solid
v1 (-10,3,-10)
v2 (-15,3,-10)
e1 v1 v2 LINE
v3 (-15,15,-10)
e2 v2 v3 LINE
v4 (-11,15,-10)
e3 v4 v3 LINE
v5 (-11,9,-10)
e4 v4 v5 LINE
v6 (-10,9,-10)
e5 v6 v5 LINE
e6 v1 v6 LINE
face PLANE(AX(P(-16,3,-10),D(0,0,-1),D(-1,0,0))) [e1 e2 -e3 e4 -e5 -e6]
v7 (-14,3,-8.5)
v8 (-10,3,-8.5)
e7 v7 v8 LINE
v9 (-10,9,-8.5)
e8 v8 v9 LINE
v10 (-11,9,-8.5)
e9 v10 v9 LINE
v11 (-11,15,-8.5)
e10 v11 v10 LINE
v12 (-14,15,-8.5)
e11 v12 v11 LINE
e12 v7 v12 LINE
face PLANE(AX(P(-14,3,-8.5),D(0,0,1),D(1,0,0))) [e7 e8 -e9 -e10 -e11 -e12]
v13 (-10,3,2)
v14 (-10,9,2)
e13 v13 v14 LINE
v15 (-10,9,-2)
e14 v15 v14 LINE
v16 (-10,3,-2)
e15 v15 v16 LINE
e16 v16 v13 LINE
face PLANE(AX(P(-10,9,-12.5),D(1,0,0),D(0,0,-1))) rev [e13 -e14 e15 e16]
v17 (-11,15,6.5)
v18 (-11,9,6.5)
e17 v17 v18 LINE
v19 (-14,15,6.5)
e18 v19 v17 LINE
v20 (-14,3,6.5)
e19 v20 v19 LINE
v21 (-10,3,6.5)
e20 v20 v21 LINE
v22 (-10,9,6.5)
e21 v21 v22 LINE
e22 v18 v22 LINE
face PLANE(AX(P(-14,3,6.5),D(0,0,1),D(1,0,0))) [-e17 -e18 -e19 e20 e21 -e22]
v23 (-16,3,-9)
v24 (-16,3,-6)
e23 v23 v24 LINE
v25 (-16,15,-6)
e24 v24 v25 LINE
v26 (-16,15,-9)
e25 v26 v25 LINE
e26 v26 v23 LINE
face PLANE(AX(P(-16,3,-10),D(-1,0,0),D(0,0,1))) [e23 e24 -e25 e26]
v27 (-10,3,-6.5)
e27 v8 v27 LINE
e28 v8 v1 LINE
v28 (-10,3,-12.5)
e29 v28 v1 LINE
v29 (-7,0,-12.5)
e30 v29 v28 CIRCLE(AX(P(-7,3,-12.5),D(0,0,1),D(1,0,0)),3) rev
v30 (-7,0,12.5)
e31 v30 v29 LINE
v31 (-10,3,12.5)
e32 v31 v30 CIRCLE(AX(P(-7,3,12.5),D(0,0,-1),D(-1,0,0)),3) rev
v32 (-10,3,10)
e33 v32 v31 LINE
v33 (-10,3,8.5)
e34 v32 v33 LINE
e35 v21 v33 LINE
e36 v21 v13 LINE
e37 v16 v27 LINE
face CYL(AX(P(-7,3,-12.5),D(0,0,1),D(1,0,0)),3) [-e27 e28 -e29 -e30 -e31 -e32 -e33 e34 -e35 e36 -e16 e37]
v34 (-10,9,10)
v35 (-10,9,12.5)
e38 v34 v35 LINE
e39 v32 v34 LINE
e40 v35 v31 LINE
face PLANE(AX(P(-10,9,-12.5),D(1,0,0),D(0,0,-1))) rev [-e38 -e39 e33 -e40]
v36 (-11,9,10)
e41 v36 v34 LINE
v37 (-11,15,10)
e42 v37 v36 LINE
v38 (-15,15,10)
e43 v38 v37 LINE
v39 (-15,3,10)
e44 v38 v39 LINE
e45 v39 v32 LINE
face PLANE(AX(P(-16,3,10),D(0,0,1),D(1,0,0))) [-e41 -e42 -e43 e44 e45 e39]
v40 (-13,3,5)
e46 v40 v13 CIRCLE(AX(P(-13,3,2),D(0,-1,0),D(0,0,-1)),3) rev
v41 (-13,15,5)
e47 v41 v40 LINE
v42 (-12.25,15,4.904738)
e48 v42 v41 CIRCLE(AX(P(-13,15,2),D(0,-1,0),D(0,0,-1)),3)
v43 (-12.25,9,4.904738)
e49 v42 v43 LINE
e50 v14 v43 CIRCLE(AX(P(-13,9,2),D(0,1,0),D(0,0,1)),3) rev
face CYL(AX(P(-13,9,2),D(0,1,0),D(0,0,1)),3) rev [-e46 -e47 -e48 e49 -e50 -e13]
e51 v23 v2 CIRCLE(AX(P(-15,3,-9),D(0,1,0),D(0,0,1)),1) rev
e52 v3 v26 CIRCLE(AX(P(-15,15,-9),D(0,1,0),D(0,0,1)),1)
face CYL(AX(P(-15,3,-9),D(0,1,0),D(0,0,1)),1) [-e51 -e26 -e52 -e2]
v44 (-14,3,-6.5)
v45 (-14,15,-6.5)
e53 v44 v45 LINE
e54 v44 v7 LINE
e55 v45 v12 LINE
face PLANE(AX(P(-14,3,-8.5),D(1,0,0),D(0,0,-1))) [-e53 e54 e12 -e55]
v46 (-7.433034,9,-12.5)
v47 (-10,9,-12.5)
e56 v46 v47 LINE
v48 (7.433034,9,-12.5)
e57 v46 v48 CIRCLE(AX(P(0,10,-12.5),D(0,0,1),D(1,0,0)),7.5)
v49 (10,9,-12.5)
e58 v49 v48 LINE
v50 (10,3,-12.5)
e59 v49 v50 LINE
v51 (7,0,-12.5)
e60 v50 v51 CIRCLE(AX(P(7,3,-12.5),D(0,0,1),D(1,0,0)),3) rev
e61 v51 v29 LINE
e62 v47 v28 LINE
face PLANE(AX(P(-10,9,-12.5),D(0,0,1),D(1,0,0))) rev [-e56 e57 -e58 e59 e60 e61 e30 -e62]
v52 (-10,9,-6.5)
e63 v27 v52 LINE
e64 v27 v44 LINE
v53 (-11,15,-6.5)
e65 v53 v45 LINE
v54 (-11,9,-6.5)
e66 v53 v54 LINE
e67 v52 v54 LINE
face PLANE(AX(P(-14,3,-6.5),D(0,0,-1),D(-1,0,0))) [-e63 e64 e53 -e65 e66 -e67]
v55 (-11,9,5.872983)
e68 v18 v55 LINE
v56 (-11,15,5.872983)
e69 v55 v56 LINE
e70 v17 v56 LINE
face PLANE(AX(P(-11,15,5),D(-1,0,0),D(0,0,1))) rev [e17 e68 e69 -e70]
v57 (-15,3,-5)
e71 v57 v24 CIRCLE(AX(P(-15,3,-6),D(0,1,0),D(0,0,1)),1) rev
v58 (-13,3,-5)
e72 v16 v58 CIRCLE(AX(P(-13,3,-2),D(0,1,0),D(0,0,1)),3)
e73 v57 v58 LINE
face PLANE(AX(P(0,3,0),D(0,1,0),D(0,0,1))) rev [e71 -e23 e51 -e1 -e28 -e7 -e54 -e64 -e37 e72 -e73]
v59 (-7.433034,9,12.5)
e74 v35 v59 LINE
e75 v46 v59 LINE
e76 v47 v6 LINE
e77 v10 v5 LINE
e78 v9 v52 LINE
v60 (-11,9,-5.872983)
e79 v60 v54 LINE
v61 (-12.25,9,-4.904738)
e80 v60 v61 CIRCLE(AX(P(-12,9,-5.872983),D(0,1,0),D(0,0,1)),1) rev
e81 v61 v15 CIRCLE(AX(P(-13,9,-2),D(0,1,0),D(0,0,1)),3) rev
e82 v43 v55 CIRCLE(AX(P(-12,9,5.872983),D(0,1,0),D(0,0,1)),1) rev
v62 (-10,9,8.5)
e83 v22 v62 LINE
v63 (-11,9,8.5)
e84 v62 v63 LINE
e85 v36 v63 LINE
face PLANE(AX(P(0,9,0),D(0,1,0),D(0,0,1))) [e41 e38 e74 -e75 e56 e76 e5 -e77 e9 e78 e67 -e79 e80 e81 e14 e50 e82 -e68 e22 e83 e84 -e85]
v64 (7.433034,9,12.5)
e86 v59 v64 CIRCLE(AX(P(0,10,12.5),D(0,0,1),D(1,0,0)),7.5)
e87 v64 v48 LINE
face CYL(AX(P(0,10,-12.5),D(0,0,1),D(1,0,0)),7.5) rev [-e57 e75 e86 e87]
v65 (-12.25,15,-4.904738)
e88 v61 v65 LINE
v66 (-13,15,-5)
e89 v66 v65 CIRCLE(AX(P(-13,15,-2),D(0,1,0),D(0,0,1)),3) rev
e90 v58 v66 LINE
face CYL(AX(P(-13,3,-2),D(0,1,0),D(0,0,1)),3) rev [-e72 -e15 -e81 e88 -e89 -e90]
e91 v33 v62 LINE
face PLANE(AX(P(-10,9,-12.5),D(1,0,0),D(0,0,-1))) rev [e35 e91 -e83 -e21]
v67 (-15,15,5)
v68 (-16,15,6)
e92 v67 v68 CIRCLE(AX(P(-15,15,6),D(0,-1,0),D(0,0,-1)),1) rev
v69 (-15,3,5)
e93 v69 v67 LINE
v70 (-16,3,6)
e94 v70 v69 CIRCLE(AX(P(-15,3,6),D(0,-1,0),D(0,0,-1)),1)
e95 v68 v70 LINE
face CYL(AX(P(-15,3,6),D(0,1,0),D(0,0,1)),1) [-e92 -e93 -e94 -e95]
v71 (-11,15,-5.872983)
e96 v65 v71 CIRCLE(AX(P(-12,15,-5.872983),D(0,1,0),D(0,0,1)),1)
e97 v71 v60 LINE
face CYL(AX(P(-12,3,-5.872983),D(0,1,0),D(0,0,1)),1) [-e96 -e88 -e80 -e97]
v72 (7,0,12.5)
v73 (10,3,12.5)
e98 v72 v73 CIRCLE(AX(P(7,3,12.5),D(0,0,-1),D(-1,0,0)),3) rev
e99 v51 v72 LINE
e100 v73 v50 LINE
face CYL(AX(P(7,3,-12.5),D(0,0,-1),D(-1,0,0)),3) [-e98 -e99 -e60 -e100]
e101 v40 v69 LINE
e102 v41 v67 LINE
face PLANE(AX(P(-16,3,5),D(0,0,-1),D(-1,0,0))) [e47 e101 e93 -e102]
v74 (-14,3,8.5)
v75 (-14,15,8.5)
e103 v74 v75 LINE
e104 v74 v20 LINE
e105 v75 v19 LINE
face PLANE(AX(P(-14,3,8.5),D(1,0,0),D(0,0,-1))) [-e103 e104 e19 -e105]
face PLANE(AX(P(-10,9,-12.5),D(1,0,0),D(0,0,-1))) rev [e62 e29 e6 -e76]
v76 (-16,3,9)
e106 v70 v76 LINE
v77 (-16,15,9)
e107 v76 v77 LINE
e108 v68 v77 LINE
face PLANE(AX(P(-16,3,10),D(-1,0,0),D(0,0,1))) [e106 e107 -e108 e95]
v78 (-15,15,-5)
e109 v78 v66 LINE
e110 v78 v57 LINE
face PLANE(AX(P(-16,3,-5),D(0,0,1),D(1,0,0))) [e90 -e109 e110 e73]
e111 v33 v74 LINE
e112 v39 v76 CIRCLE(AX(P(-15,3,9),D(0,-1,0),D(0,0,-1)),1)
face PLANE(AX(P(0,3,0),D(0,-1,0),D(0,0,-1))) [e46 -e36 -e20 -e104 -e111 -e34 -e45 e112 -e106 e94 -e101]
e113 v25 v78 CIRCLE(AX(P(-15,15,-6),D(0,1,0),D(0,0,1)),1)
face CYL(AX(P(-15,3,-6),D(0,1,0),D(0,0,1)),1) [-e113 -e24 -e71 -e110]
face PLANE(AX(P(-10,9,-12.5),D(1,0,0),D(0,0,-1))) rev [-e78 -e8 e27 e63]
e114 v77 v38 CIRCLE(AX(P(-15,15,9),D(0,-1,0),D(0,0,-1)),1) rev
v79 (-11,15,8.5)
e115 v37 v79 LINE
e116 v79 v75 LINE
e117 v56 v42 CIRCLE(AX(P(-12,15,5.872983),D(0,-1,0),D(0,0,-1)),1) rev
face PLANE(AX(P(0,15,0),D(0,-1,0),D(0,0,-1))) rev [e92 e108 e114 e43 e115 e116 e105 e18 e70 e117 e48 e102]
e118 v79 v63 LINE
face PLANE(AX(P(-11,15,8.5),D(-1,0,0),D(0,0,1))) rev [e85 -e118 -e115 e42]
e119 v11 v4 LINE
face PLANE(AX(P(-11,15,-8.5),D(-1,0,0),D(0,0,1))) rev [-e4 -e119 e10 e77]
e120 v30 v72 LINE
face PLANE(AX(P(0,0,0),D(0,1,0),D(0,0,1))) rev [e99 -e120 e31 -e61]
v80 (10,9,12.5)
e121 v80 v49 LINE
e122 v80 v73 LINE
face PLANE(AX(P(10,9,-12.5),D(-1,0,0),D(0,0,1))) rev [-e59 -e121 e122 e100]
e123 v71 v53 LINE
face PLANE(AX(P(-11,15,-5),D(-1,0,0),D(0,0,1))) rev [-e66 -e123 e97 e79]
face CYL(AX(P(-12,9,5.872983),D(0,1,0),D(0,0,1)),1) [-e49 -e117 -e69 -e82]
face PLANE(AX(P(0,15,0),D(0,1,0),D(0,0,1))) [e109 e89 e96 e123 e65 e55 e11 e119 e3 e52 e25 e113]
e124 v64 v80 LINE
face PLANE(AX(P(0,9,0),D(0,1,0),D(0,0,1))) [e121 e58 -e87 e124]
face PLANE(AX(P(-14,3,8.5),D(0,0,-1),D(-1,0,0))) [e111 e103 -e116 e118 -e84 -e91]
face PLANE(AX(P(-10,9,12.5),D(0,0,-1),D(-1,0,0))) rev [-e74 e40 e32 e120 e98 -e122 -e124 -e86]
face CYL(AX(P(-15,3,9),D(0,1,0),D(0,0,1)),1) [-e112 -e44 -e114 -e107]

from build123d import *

# Parameters (mm, degrees)
ESBO_O1_W                = 20
ESBO_O1_H                = 25
RESSALTO_EXTRUS_O1_DEPTH = 9
ESBO_O2_R                = 7.5
CORTE_EXTRUS_O1_DEPTH    = 29.390139133
FILETE1_R                = 3
RESSALTO_EXTRUS_O2_DEPTH = 6
RESSALTO_EXTRUS_O3_DEPTH = 6
FILETE3_R                = 1
FILETE5_R                = 3
FILETE6_R                = 1


with BuildPart() as part:
    # Esboço1 → Ressalto-extrusão1 (new body)
    with BuildSketch(Plane(origin=(0, 0, 0), x_dir=(1, 0, 0), z_dir=(0, 1, 0))):
        Rectangle(ESBO_O1_W, ESBO_O1_H)
    extrude(amount=RESSALTO_EXTRUS_O1_DEPTH)

    # Esboço2 → Corte-extrusão1 (cut, through all)
    with BuildSketch(Plane.XY.offset(12.5)):
        with Locations((0, 10)):
            Circle(ESBO_O2_R)
    extrude(amount=-CORTE_EXTRUS_O1_DEPTH, mode=Mode.SUBTRACT)

    # Filete1
    filete1_edges = [part.edges().sort_by_distance(p)[0] for p in [
        (-10, 0, 0),
        (10, 0, 0),
    ]]
    fillet(filete1_edges, radius=FILETE1_R)

    # Esboço3 → Ressalto-extrusão2 (add)
    with BuildSketch(Plane(origin=(0, 9, 0), x_dir=(1, 0, 0), z_dir=(0, 1, 0))):
        Polygon((-16, 10), (-10, 10), (-10, 8.5), (-14, 8.5), (-14, 6.5), (-10, 6.5), (-10, 5), (-16, 5), align=None)
        Polygon((-14, -6.5), (-10, -6.5), (-10, -5), (-16, -5), (-16, -10), (-10, -10), (-10, -8.5), (-14, -8.5), align=None)
    extrude(amount=-RESSALTO_EXTRUS_O2_DEPTH)

    # Esboço4 → Ressalto-extrusão3 (add)
    with BuildSketch(Plane(origin=(0, 9, 0), x_dir=(1, 0, 0), z_dir=(0, 1, 0))):
        Polygon((-16, -10), (-16, -5), (-11, -5), (-11, -6.5), (-14, -6.5), (-14, -8.5), (-11, -8.5), (-11, -10), align=None)
        Polygon((-11, 10), (-16, 10), (-16, 5), (-11, 5), (-11, 6.5), (-14, 6.5), (-14, 8.5), (-11, 8.5), align=None)
    extrude(amount=RESSALTO_EXTRUS_O3_DEPTH)

    # Filete3
    filete3_edges = [part.edges().sort_by_distance(p)[0] for p in [
        (-16, 9, -5),
        (-16, 9, -10),
        (-16, 9, 10),
        (-16, 9, 5),
    ]]
    fillet(filete3_edges, radius=FILETE3_R)

    # Filete5
    # the kernel refuses this fillet: 3 mm, written as the material it adds along each edge
    with BuildSketch(Plane(origin=(-10, 16.5, -5), x_dir=(-1, 0, 0), z_dir=(0, -1, 0))) as filete5_piece_1_section:
        with BuildLine():
            CenterArc((FILETE5_R, -FILETE5_R), FILETE5_R, 90, 90)
            Line((0, -FILETE5_R), (0, 0))
            Line((0, 0), (FILETE5_R, 0))
        make_face()
    filete5_piece_1 = extrude(amount=13.5, mode=Mode.PRIVATE)
    filete5_piece_1 = split(filete5_piece_1, bisect_by=Plane(origin=(-11.589070595, 9, -4.827479681), z_dir=(0, 1, 0)), keep=Keep.TOP, mode=Mode.PRIVATE)
    filete5_piece_1 = split(filete5_piece_1, bisect_by=Plane(origin=(-11, 12, -4.827479681), z_dir=(-1, 0, 0)), keep=Keep.TOP, mode=Mode.PRIVATE)
    filete5_piece_1 = split(filete5_piece_1, bisect_by=Plane(origin=(-11.589070595, 15, -4.827479681), z_dir=(0, -1, 0)), keep=Keep.TOP, mode=Mode.PRIVATE)
    add(filete5_piece_1)
    with BuildSketch(Plane(origin=(-10, 9, -5), x_dir=(-1, 0, 0), z_dir=(0, -1, 0))) as filete5_piece_2_section:
        with BuildLine():
            CenterArc((FILETE5_R, -FILETE5_R), FILETE5_R, 90, 90)
            Line((0, -FILETE5_R), (0, 0))
            Line((0, 0), (FILETE5_R, 0))
        make_face()
    filete5_piece_2 = extrude(amount=6, mode=Mode.PRIVATE)
    filete5_piece_2 = split(filete5_piece_2, bisect_by=Plane(origin=(-11, 6, -4.827479681), z_dir=(-1, 0, 0)), keep=Keep.TOP, mode=Mode.PRIVATE)
    add(filete5_piece_2)
    with BuildSketch(Plane(origin=(-10, 9, -5), x_dir=(-1, 0, 0), z_dir=(0, -1, 0))) as filete5_piece_3_section:
        with BuildLine():
            CenterArc((FILETE5_R, -FILETE5_R), FILETE5_R, 90, 90)
            Line((0, -FILETE5_R), (0, 0))
            Line((0, 0), (FILETE5_R, 0))
        make_face()
    filete5_piece_3 = extrude(amount=6, mode=Mode.PRIVATE)
    filete5_piece_3 = split(filete5_piece_3, bisect_by=Plane(origin=(-11, 6, -4.141402177), z_dir=(1, 0, 0)), keep=Keep.TOP, mode=Mode.PRIVATE)
    add(filete5_piece_3)
    with BuildSketch(Plane(origin=(-10, 16.5, 5), x_dir=(-1, 0, 0), z_dir=(0, -1, 0))) as filete5_piece_4_section:
        with BuildLine():
            CenterArc((FILETE5_R, FILETE5_R), FILETE5_R, 180, 90)
            Line((0, FILETE5_R), (0, 0))
            Line((0, 0), (FILETE5_R, 0))
        make_face()
    filete5_piece_4 = extrude(amount=13.5, mode=Mode.PRIVATE)
    filete5_piece_4 = split(filete5_piece_4, bisect_by=Plane(origin=(-11.589070595, 15, 4.827479681), z_dir=(0, -1, 0)), keep=Keep.TOP, mode=Mode.PRIVATE)
    filete5_piece_4 = split(filete5_piece_4, bisect_by=Plane(origin=(-11.589070595, 9, 4.827479681), z_dir=(0, 1, 0)), keep=Keep.TOP, mode=Mode.PRIVATE)
    filete5_piece_4 = split(filete5_piece_4, bisect_by=Plane(origin=(-11, 12, 4.827479681), z_dir=(-1, 0, 0)), keep=Keep.TOP, mode=Mode.PRIVATE)
    add(filete5_piece_4)
    with BuildSketch(Plane(origin=(-10, 9, 5), x_dir=(-1, 0, 0), z_dir=(0, -1, 0))) as filete5_piece_5_section:
        with BuildLine():
            CenterArc((FILETE5_R, FILETE5_R), FILETE5_R, 180, 90)
            Line((0, FILETE5_R), (0, 0))
            Line((0, 0), (FILETE5_R, 0))
        make_face()
    filete5_piece_5 = extrude(amount=6, mode=Mode.PRIVATE)
    filete5_piece_5 = split(filete5_piece_5, bisect_by=Plane(origin=(-11, 6, 4.827479681), z_dir=(-1, 0, 0)), keep=Keep.TOP, mode=Mode.PRIVATE)
    add(filete5_piece_5)
    with BuildSketch(Plane(origin=(-10, 9, 5), x_dir=(-1, 0, 0), z_dir=(0, -1, 0))) as filete5_piece_6_section:
        with BuildLine():
            CenterArc((FILETE5_R, FILETE5_R), FILETE5_R, 180, 90)
            Line((0, FILETE5_R), (0, 0))
            Line((0, 0), (FILETE5_R, 0))
        make_face()
    filete5_piece_6 = extrude(amount=6, mode=Mode.PRIVATE)
    filete5_piece_6 = split(filete5_piece_6, bisect_by=Plane(origin=(-11, 6, 4.141402177), z_dir=(1, 0, 0)), keep=Keep.TOP, mode=Mode.PRIVATE)
    add(filete5_piece_6)

    # Filete6
    filete6_edges = [part.edges().sort_by_distance(p)[0] for p in [
        (-11, 12, -4.236067977),
        (-11, 12, 4.236067977),
    ]]
    fillet(filete6_edges, radius=FILETE6_R)


solid = part.part
